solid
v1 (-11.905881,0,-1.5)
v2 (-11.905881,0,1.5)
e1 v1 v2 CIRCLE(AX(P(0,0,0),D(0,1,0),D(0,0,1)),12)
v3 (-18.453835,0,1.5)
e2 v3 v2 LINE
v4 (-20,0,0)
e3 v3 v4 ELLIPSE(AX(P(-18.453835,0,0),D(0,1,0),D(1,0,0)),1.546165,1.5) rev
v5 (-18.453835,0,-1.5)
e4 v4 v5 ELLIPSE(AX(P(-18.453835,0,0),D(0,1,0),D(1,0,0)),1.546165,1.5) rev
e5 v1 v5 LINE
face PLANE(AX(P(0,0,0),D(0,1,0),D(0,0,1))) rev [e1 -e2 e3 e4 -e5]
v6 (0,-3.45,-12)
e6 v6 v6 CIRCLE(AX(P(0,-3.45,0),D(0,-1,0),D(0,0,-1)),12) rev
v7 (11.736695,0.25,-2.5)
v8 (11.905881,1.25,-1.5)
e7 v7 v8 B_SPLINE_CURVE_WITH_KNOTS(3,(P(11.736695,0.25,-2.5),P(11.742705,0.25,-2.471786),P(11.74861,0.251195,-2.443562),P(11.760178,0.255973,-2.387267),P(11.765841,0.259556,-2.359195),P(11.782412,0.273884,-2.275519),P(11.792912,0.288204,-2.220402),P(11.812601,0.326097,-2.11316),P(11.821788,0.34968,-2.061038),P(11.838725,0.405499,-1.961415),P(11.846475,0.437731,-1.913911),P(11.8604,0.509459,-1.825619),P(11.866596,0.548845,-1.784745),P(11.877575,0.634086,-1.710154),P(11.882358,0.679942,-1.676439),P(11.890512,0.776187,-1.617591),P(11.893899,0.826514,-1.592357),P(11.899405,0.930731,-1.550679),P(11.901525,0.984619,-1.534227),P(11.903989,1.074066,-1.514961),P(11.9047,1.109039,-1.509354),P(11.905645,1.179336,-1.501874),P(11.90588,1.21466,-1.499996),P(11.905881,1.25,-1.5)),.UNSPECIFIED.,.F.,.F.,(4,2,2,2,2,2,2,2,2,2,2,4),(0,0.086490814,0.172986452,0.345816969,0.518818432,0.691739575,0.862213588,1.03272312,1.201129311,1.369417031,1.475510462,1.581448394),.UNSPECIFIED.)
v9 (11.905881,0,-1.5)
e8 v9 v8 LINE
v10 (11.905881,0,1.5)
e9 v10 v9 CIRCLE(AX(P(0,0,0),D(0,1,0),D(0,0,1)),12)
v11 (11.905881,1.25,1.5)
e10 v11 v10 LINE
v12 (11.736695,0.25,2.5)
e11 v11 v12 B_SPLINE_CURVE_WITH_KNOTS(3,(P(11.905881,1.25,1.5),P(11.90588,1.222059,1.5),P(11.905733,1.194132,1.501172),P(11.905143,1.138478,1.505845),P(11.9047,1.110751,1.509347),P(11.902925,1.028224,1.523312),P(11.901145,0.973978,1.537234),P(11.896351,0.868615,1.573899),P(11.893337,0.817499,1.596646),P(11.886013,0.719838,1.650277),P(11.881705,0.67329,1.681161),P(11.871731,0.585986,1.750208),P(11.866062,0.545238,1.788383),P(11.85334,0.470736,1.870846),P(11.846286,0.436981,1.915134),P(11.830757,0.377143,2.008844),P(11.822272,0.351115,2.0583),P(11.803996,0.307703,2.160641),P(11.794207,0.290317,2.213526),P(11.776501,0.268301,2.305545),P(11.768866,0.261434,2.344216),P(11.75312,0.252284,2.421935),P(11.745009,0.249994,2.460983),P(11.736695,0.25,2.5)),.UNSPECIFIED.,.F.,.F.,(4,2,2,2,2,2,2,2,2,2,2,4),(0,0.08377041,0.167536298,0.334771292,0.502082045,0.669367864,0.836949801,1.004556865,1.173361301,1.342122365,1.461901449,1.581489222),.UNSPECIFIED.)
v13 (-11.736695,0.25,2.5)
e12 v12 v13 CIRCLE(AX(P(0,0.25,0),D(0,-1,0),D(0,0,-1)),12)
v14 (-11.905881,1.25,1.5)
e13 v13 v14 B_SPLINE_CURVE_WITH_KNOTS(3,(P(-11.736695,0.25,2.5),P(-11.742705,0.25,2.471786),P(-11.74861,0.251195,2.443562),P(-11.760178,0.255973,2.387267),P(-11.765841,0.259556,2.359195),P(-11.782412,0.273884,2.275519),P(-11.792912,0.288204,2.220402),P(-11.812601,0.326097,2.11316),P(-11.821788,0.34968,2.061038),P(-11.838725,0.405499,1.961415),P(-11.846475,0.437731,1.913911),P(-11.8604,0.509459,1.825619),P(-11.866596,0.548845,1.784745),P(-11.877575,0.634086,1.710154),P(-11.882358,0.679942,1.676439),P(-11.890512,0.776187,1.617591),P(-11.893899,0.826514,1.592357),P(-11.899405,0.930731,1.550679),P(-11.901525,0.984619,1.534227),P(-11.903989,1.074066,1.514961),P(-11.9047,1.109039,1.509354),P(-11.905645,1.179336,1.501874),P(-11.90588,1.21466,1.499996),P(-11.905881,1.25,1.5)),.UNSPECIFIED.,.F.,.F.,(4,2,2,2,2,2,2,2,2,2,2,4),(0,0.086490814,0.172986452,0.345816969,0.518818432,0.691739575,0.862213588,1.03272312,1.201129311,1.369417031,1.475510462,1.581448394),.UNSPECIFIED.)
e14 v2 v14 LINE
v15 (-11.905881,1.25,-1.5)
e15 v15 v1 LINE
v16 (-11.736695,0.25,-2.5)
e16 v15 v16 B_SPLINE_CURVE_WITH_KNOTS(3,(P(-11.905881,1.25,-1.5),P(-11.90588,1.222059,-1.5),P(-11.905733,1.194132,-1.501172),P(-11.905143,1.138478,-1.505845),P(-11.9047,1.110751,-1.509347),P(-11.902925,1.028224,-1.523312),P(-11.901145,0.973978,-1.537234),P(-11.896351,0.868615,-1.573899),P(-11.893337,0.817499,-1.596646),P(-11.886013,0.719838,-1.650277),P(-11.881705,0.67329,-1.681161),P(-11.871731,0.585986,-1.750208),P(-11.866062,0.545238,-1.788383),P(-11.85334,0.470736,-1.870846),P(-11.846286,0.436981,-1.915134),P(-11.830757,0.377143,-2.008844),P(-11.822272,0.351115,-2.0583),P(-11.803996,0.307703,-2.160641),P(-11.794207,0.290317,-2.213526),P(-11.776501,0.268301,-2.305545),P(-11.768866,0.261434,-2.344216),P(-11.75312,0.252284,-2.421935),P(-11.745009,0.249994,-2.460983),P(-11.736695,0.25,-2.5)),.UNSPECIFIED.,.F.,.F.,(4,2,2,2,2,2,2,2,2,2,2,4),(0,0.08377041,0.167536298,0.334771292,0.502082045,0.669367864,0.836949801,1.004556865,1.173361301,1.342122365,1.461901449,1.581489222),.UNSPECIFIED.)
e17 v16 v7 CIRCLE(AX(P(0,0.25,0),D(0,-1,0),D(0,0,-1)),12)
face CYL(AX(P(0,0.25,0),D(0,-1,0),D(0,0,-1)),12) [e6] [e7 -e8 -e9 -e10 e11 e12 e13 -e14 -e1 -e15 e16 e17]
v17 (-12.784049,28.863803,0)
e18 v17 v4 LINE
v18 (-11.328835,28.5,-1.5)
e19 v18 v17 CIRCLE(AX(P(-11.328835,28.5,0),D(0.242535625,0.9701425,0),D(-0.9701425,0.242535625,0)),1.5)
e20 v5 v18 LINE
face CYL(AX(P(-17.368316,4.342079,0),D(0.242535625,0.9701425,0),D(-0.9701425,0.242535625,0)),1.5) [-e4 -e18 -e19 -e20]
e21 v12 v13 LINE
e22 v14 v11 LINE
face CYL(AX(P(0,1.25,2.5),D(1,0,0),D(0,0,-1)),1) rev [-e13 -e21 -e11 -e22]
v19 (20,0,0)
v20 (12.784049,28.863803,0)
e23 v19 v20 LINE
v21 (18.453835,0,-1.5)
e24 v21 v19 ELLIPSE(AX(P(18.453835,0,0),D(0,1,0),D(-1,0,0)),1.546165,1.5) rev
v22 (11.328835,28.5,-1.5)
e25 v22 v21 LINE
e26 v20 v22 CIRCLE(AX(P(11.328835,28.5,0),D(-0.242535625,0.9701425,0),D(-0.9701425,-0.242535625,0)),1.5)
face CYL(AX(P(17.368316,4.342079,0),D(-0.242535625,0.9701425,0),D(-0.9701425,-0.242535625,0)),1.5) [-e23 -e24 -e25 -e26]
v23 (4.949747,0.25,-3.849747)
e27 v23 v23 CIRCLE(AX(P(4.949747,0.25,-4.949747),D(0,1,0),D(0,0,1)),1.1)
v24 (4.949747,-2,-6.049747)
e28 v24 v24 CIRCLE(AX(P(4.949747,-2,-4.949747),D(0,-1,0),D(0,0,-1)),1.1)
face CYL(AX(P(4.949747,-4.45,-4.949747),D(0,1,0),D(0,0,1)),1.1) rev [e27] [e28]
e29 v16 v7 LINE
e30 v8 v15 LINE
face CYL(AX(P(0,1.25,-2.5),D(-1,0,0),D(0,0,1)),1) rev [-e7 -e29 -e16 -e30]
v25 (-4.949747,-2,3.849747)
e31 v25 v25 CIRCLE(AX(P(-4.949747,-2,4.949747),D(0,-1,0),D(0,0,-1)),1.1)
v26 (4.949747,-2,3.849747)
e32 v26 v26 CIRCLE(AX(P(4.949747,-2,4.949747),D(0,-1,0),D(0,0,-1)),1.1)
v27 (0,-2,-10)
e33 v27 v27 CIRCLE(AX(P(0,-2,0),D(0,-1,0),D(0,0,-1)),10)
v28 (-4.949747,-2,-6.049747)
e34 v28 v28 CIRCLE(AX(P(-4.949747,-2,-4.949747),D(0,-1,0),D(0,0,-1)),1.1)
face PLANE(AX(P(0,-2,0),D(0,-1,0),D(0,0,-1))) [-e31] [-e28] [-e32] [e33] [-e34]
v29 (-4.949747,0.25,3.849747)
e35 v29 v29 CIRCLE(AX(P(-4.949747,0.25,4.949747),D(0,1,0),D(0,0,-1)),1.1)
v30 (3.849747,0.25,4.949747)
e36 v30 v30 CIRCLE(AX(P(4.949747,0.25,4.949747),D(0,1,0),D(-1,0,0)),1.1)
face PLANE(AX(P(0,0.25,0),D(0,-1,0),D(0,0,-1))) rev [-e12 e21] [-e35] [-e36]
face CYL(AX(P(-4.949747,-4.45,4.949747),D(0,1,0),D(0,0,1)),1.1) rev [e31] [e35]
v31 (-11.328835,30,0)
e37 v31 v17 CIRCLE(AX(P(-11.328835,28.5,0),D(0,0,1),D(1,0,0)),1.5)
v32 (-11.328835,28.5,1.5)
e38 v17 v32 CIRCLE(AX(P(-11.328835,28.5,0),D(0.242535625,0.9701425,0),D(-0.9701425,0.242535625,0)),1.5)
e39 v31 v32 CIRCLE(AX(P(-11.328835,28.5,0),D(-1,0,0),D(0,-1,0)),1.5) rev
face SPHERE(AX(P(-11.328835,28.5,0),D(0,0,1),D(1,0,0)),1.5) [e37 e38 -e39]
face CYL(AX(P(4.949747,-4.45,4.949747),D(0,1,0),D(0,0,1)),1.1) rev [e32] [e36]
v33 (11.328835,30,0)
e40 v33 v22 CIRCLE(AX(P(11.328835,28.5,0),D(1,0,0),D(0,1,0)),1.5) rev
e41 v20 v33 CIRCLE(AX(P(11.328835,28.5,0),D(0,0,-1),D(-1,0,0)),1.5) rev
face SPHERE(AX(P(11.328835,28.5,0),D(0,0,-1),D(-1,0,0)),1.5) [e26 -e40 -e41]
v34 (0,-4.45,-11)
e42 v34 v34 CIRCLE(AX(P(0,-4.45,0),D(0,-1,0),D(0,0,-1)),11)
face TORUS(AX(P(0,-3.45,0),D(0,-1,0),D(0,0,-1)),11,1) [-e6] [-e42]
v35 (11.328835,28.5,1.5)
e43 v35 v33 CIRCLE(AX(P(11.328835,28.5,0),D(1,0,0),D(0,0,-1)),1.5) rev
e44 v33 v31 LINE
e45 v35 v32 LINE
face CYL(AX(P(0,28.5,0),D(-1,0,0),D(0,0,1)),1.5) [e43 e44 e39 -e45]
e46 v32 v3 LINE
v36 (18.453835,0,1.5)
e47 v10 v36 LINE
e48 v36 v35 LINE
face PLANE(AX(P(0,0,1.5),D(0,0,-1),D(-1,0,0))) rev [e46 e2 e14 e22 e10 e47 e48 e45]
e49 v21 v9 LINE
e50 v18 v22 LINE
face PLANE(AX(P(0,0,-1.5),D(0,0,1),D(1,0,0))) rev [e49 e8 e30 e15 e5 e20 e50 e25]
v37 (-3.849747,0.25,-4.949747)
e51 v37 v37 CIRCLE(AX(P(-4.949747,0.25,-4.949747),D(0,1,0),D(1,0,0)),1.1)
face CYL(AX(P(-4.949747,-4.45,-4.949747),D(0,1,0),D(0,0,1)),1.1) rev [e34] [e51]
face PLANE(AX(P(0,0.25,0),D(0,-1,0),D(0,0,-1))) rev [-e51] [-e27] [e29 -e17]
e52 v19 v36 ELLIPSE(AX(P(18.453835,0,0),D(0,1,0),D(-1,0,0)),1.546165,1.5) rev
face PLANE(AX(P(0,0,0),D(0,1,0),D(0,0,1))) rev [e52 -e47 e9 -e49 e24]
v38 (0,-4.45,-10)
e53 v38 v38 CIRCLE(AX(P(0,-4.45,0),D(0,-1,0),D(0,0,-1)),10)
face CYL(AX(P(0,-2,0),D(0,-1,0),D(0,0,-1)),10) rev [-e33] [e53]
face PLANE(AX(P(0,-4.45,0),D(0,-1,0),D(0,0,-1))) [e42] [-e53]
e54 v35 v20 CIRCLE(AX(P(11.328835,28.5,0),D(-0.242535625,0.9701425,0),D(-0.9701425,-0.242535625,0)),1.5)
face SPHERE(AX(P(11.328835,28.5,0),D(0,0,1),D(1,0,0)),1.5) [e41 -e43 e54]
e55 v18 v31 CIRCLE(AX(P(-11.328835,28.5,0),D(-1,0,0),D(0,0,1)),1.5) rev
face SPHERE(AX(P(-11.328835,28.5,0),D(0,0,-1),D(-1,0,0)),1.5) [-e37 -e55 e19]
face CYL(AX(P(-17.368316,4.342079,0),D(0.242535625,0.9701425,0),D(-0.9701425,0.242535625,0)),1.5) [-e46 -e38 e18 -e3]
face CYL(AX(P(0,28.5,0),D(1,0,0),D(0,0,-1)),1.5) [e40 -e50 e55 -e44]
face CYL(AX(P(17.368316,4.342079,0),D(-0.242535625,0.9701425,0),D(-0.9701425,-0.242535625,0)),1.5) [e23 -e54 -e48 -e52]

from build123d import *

# Parameters (mm, degrees)
FILLET1_R                = 1.5
BOSS_EXTRUDE1_DEPTH      = 4.45
BOSS_EXTRUDE1_DEPTH_BACK = 0.25
SKETCH3_R                = 12
FILLET2_R                = 1
SKETCH4_R                = 10
CUT_EXTRUDE1_DEPTH       = 2.45
SKETCH8_R                = 1.1
CUT_EXTRUDE2_DEPTH       = 38.80294317
CIRPATTERN1_COUNT        = 4


with BuildPart() as part:
    # Sketch1 → Loft1 section 0
    with BuildSketch(Plane(origin=(0, 0, 0), x_dir=(1, 0, 0), z_dir=(0, 1, 0))):
        with BuildLine():
            Line((-20, 1.5), (20, 1.5))
            Line((20, 1.5), (20, -1.5))
            Line((20, -1.5), (-20, -1.5))
            Line((-20, -1.5), (-20, 1.5))
        make_face()
    # Sketch2 → Loft1 section 1
    with BuildSketch(Plane(origin=(0, 30, 0), x_dir=(1, 0, 0), z_dir=(0, 1, 0))):
        with BuildLine():
            Line((-12.5, 1.5), (12.5, 1.5))
            Line((12.5, 1.5), (12.5, -1.5))
            Line((12.5, -1.5), (-12.5, -1.5))
            Line((-12.5, -1.5), (-12.5, 1.5))
        make_face()
    loft()

    # Fillet1
    fillet1_edges = [part.edges().sort_by_distance(p)[0] for p in [
        (0, 30, -1.5),
        (-12.5, 30, 0),
        (0, 30, 1.5),
        (12.5, 30, 0),
        (16.25, 15, 1.5),
        (-16.25, 15, 1.5),
        (16.25, 15, -1.5),
        (-16.25, 15, -1.5),
    ]]
    fillet(fillet1_edges, radius=FILLET1_R - 0.0001)  # a hair under: the kernel refuses the full size

    # Sketch3 → Boss-Extrude1 (add, two sides: drawn at the far end of the back side and taken through both)
    with BuildSketch(Plane.XZ.offset(-BOSS_EXTRUDE1_DEPTH_BACK)):
        with Locations(Location((0, 0, 0), (0, 0, 270))):
            Circle(SKETCH3_R)
    extrude(amount=BOSS_EXTRUDE1_DEPTH + BOSS_EXTRUDE1_DEPTH_BACK)

    # Fillet2
    fillet2_edges = [part.edges().sort_by_distance(p)[0] for p in [
        (0, 0.25, 1.5),
        (0, 0.25, -1.5),
        (0, -4.45, 12),
    ]]
    fillet(fillet2_edges, radius=FILLET2_R)

    # Sketch4 → Cut-Extrude1 (cut)
    with BuildSketch(Plane.XZ.offset(4.45)):
        with Locations(Location((0, 0, 0), (0, 0, 270))):
            Circle(SKETCH4_R)
    extrude(amount=-CUT_EXTRUDE1_DEPTH, mode=Mode.SUBTRACT)

    # Sketch8 → Cut-Extrude2 (cut, through all)
    with BuildSketch(Plane(origin=(0, 0.25, 0), x_dir=(1, 0, 0), z_dir=(0, 1, 0))):
        with Locations(Location((4.949747468, 4.949747468, 0), (0, 0, 270))):
            Circle(SKETCH8_R)
    cut_extrude2 = extrude(amount=-CUT_EXTRUDE2_DEPTH, mode=Mode.SUBTRACT)

    # CirPattern1: Cut-Extrude2 ×4 about axis
    cirpattern1_axis = Axis((0, 0, 0), (0, 1, 0))
    for i in range(1, CIRPATTERN1_COUNT):
        add(cut_extrude2.rotate(cirpattern1_axis, i * 360 / CIRPATTERN1_COUNT), mode=Mode.SUBTRACT)


solid = part.part
